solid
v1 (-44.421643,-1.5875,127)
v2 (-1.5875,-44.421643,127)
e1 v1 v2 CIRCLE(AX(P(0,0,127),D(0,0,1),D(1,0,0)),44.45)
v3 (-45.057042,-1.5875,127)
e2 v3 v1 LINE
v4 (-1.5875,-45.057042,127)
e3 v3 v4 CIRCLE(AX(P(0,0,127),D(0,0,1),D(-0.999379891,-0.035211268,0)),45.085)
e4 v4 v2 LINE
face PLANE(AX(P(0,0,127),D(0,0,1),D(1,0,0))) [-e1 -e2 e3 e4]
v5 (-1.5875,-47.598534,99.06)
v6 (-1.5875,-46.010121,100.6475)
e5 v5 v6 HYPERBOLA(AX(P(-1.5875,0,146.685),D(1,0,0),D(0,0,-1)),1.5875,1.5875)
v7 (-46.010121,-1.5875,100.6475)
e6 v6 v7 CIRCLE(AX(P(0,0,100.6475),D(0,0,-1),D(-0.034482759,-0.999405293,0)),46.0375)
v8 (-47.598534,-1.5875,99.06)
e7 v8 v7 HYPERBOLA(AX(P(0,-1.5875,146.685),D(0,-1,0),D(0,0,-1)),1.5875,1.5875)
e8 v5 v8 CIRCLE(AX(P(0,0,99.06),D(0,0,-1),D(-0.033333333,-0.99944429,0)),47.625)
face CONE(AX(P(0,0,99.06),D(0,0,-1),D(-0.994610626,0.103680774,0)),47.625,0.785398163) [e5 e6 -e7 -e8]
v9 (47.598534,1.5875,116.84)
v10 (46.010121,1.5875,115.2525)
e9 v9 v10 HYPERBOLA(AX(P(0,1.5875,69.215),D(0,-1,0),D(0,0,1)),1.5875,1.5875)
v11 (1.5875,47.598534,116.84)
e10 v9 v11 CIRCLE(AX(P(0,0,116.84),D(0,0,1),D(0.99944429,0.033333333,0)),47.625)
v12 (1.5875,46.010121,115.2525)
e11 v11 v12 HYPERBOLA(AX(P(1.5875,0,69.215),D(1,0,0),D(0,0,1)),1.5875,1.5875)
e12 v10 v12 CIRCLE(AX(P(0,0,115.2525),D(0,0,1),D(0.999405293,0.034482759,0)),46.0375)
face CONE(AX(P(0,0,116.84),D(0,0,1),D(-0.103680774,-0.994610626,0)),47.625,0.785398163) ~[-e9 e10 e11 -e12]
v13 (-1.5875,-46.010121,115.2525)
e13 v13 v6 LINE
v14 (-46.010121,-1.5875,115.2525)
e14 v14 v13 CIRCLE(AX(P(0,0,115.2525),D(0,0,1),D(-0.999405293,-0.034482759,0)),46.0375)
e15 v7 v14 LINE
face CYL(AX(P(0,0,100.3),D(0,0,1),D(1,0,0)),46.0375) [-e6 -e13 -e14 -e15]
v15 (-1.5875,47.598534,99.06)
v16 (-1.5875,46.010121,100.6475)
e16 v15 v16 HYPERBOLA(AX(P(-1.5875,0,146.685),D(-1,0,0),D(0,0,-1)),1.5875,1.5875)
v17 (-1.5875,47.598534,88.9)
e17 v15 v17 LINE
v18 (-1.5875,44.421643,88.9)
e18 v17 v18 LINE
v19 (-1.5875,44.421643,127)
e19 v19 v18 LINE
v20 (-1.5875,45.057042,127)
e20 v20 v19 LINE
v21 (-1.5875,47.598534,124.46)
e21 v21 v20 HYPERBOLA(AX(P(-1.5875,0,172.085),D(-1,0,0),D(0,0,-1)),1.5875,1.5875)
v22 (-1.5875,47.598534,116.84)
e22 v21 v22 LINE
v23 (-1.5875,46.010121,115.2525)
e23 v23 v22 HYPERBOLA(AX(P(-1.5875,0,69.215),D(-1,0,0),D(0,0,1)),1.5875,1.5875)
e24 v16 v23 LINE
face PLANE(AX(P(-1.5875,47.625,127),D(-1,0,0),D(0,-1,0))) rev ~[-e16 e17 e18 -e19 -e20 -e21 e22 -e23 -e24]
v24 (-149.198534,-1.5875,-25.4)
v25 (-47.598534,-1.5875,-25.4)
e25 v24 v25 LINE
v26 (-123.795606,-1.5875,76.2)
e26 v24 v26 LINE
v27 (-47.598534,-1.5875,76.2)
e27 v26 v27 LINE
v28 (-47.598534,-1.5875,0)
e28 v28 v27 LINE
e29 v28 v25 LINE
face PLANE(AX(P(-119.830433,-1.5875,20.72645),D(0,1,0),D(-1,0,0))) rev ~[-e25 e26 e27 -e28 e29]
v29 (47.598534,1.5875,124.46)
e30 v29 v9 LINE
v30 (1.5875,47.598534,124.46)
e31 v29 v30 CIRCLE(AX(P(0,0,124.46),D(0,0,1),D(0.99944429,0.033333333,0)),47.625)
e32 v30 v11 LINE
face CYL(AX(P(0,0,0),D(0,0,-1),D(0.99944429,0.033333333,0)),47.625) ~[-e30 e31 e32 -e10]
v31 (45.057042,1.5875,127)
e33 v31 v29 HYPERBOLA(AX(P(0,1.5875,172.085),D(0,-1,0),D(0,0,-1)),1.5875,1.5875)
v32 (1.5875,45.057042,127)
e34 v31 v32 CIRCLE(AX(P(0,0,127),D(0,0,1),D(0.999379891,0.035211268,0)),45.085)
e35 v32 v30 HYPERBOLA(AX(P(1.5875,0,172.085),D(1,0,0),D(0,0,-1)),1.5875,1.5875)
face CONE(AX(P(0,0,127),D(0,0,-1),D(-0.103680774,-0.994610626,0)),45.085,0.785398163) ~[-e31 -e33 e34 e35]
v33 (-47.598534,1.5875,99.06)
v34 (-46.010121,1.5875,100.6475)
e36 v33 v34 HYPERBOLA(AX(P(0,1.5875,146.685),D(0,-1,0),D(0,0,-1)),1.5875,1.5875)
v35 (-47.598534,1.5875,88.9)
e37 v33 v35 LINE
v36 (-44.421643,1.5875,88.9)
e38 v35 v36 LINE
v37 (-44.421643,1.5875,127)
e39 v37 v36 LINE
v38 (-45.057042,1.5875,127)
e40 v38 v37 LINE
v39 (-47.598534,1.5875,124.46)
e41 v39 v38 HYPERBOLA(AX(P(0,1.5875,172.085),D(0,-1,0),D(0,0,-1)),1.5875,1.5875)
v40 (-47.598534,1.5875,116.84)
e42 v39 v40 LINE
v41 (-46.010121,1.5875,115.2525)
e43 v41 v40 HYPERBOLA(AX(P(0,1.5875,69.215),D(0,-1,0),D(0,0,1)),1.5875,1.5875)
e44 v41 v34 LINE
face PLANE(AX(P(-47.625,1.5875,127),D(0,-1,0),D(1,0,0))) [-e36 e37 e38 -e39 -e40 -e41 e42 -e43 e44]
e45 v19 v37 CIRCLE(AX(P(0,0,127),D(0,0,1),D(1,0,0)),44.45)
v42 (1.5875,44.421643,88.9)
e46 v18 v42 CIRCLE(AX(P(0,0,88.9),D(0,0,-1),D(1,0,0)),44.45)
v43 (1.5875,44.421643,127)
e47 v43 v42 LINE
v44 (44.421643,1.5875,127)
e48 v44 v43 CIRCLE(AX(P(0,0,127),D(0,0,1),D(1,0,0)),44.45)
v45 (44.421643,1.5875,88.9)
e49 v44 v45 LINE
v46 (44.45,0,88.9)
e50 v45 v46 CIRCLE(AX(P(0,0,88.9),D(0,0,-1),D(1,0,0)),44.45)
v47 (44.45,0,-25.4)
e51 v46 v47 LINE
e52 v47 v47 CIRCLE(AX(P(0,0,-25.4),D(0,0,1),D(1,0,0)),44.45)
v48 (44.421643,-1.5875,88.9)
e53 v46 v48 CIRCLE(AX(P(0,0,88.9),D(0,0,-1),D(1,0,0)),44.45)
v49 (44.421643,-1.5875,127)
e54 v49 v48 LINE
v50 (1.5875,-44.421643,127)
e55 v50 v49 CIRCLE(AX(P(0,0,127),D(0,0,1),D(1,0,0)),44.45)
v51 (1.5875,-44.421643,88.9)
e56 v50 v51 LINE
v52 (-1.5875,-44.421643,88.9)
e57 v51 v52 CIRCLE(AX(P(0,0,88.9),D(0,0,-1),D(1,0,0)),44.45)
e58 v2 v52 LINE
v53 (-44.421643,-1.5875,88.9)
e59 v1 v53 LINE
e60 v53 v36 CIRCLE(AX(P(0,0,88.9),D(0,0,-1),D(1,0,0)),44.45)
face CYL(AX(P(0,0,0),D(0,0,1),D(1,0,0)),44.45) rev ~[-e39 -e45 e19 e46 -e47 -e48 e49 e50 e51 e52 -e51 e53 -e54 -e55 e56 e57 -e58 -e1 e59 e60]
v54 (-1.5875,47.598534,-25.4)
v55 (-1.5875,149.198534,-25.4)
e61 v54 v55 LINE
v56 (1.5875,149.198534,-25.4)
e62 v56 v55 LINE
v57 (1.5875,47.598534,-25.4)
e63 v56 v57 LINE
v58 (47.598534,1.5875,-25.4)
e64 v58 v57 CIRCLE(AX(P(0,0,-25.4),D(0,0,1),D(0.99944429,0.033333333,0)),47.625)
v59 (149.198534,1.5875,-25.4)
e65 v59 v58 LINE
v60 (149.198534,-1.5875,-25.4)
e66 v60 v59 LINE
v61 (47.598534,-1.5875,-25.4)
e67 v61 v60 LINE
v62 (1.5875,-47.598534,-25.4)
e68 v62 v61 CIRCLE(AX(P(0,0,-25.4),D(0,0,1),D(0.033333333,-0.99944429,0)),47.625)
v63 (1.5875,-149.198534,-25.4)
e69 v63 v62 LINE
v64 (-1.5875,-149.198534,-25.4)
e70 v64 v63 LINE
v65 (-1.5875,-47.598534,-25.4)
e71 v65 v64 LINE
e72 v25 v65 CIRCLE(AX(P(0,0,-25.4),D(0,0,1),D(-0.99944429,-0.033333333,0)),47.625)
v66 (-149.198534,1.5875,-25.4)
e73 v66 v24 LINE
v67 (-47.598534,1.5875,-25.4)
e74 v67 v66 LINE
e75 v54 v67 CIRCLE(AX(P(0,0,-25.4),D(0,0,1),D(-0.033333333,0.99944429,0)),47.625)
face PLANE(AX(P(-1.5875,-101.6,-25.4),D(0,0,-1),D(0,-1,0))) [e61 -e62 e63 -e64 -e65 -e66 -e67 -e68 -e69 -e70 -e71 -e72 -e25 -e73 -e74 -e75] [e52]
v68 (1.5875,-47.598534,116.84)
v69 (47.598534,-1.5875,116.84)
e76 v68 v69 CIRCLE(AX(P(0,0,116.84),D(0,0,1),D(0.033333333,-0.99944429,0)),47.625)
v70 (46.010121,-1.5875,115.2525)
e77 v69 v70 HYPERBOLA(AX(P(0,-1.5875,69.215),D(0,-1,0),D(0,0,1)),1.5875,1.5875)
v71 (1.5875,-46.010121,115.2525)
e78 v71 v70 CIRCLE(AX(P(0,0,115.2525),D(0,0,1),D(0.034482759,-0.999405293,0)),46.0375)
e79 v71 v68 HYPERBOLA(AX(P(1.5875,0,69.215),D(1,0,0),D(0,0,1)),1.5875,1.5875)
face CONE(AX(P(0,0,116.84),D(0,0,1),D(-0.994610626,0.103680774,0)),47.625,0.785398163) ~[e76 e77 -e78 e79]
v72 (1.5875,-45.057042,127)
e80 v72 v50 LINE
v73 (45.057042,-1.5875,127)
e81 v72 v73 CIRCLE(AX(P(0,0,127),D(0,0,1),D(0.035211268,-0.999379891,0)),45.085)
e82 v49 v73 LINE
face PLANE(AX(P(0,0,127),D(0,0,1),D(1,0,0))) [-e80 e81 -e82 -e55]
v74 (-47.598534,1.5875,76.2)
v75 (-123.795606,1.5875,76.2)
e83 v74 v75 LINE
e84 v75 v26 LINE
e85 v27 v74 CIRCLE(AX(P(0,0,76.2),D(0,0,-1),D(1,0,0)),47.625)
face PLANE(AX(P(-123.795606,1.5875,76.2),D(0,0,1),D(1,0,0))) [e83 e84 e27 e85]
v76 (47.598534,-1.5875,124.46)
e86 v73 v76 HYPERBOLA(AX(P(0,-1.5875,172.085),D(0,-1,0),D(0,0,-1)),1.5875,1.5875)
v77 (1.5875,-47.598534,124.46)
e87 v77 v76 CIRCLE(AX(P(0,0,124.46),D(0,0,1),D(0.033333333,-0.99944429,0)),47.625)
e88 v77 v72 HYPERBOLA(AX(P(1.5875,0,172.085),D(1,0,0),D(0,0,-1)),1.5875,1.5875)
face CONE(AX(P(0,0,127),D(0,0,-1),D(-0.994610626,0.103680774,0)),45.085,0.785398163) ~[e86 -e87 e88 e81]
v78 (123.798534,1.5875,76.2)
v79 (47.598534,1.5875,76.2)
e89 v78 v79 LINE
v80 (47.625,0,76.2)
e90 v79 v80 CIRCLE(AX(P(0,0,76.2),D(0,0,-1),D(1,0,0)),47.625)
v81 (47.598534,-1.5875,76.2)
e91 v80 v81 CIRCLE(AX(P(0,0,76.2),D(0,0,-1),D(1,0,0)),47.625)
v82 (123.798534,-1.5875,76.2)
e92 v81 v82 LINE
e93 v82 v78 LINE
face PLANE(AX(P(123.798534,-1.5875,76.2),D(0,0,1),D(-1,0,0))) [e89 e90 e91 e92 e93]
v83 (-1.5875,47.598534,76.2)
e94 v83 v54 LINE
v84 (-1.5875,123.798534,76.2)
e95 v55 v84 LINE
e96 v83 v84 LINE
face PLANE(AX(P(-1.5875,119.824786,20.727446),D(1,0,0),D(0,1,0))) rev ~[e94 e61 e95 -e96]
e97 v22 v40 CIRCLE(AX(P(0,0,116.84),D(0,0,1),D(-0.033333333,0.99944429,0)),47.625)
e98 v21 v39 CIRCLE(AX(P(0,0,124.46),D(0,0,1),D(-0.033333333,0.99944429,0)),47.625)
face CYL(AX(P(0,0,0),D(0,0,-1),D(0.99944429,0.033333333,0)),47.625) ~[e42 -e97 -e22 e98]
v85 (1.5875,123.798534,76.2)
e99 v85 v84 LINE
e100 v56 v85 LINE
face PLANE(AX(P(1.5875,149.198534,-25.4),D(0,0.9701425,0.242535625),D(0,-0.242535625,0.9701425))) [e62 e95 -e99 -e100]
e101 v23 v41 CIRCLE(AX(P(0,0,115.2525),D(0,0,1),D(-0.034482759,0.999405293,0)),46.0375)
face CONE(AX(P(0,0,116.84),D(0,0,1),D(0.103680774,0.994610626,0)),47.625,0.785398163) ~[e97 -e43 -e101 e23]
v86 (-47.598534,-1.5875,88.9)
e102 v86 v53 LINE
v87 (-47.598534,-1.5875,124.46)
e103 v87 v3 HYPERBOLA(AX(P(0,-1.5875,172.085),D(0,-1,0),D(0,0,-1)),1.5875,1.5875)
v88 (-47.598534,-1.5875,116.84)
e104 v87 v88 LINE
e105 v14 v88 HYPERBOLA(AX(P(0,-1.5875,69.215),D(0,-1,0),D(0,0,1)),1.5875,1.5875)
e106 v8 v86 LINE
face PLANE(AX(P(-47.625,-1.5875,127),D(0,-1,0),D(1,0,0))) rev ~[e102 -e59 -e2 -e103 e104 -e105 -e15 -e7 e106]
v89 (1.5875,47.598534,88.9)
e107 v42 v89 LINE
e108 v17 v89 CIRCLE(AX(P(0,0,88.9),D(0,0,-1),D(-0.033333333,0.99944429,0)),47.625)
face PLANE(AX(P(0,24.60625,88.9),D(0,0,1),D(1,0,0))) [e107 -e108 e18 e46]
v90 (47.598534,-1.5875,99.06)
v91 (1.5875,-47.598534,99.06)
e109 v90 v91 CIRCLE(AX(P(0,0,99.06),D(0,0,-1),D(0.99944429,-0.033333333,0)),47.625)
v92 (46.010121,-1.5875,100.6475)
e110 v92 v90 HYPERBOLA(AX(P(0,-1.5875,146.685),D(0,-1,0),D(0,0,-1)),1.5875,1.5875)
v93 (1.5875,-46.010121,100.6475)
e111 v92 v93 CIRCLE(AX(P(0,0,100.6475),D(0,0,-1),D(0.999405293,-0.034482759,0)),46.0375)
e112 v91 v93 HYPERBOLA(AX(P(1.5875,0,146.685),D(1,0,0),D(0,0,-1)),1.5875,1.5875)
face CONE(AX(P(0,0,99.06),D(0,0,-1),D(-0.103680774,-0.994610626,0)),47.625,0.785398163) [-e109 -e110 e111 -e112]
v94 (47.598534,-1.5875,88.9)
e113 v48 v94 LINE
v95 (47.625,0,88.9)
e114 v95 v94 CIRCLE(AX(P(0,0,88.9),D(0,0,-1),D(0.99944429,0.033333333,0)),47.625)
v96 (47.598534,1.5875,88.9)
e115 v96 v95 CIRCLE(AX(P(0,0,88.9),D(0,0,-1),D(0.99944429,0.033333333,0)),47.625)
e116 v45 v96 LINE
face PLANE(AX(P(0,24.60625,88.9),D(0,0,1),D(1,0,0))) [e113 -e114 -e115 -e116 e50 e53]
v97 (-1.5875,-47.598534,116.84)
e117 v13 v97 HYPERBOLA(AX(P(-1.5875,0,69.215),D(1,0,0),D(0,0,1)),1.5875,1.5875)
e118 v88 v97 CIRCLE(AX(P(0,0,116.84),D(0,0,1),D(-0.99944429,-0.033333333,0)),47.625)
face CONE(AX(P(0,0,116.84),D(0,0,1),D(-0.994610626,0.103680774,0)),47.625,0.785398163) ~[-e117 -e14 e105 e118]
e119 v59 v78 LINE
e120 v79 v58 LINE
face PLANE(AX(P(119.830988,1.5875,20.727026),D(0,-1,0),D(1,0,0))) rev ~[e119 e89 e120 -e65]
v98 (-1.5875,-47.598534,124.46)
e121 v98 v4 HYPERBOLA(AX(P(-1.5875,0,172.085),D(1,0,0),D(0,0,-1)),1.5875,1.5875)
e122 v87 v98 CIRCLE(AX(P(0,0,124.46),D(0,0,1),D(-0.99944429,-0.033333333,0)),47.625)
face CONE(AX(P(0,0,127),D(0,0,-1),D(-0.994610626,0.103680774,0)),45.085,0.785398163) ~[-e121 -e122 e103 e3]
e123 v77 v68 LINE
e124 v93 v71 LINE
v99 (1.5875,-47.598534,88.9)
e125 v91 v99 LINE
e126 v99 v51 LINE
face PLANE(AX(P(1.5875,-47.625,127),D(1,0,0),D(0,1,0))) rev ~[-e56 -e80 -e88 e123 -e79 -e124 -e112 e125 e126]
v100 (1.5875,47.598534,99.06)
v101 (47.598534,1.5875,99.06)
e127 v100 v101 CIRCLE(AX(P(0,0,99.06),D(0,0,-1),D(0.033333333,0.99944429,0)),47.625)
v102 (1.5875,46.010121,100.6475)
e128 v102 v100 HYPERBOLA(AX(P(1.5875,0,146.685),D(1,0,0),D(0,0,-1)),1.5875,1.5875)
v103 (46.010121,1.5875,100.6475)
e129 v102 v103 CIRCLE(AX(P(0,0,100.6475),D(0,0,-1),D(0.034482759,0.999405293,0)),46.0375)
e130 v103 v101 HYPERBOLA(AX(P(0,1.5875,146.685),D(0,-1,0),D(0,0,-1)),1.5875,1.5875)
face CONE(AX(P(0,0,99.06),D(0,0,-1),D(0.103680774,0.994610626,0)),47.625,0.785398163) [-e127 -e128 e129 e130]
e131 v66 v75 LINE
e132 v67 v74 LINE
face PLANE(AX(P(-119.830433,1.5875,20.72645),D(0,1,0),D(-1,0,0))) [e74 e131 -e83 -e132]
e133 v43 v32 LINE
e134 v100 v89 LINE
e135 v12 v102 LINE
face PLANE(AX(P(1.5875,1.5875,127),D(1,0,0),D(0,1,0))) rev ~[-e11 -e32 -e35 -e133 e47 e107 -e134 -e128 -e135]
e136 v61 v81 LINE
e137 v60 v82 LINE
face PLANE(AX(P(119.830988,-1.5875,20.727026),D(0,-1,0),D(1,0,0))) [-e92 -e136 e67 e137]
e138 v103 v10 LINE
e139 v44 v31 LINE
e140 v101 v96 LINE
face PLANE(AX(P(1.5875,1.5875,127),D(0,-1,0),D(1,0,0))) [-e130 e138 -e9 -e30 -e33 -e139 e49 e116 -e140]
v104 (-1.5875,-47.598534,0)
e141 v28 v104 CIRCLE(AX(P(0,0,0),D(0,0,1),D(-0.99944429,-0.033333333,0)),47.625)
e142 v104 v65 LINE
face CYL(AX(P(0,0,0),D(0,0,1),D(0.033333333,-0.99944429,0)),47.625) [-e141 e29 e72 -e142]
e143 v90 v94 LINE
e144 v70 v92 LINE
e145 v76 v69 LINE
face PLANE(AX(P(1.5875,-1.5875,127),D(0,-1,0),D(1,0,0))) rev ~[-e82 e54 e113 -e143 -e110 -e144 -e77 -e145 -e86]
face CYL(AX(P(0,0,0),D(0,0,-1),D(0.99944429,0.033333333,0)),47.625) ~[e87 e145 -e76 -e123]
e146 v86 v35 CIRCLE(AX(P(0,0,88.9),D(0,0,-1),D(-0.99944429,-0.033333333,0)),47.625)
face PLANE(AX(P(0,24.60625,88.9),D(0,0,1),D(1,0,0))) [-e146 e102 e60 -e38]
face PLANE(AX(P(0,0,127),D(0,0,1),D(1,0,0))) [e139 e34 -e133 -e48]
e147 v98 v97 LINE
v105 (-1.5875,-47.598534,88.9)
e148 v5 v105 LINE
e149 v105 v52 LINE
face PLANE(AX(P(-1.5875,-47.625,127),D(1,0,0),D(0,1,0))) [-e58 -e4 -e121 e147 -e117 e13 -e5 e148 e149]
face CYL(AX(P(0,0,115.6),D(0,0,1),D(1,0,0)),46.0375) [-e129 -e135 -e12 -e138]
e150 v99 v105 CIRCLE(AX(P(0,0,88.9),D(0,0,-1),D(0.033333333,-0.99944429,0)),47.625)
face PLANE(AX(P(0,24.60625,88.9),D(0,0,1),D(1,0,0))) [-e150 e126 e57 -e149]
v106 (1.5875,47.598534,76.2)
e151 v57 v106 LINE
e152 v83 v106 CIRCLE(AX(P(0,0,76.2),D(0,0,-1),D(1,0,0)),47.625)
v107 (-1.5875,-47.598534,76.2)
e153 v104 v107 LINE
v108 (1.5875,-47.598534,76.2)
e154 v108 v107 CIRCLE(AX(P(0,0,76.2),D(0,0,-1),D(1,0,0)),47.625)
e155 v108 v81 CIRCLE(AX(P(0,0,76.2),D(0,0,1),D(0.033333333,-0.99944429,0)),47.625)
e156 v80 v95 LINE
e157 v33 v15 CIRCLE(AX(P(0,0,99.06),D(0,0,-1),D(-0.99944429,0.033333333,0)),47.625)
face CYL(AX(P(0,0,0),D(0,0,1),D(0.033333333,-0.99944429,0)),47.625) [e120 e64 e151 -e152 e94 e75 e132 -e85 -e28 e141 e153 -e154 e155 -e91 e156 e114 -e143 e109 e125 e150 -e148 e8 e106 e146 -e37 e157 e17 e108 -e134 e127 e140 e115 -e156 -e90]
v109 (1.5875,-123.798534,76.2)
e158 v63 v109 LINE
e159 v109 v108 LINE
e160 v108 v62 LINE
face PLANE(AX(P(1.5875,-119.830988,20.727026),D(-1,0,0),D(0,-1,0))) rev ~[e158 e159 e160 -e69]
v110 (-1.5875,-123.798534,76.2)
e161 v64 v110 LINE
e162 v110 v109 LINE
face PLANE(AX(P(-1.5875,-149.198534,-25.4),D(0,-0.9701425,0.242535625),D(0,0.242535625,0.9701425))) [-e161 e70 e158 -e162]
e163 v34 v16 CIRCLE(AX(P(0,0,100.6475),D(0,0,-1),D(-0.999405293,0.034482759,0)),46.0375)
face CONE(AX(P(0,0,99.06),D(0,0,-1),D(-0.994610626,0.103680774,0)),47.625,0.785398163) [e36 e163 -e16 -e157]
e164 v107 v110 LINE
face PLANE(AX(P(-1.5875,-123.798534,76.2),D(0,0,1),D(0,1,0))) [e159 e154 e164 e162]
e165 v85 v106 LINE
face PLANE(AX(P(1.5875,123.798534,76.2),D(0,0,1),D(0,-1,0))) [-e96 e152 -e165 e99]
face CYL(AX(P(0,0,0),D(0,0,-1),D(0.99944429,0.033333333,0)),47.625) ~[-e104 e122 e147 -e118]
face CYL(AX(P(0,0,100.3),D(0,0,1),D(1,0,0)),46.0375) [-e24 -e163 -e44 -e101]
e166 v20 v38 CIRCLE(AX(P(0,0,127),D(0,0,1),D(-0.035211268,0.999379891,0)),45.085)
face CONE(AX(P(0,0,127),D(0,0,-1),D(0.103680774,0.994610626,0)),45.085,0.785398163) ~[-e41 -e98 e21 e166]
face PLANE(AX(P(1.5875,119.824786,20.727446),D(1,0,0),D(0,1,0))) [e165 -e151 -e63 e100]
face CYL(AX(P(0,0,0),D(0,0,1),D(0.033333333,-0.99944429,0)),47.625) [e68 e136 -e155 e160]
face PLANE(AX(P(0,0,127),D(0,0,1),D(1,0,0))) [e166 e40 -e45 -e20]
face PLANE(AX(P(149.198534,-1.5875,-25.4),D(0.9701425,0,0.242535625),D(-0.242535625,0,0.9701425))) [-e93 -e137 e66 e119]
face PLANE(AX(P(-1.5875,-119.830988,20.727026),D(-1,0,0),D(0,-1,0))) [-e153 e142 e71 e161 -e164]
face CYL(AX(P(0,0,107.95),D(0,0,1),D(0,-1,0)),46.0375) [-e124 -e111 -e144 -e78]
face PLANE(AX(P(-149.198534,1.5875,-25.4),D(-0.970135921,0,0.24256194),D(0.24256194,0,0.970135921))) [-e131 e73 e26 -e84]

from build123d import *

# Parameters (mm, degrees)
F0_R         = 44.45
F1_DEPTH     = 76.2
F2_R         = 47.625
F2_R_2       = 44.45
F3_DEPTH     = 127
F4_W         = 3.175
F4_H         = 46.0375
F4_H_2       = 3.175
F4_W_2       = 46.0375
F5_DEPTH     = 38.1
F6_W         = 1.5875
F6_H         = 12.7
F8_T2_ANGLE  = 101.902331204
F8_T6_ANGLE  = 101.902331204
F8_S7_R      = 46.0375
F8_T8_DEPTH  = 39
F8_T12_ANGLE = 101.902331204
F8_S13_R     = 46.0375
F8_T14_DEPTH = 39
F8_T18_ANGLE = 101.902331204
F8_S19_R     = 46.0375
F8_T20_DEPTH = 39
F8_T24_ANGLE = 101.902331204
F8_S25_R     = 46.0375
F8_T26_DEPTH = 39
F8_T28_ANGLE = 101.902331204
F8_T32_ANGLE = 101.902331204
F8_S33_R     = 46.0375
F8_T34_DEPTH = 39
F8_T36_ANGLE = 101.902331204
F8_T40_ANGLE = 101.902331204
F8_S41_R     = 46.0375
F8_T42_DEPTH = 39
F8_T44_ANGLE = 101.902331204
F8_T48_ANGLE = 101.902331204
F8_S49_R     = 46.0375
F8_T50_DEPTH = 39
F8_T54_ANGLE = 101.902331204
F8_S55_R     = 46.0375
F8_T56_DEPTH = 39
F9_DEPTH     = 25.4
F11_DEPTH    = 3.175
F13_DEPTH    = 3.175
F15_DEPTH    = 3.175
F17_DEPTH    = 3.175


# Not quite as in the source:
# - a fillet or chamfer that OpenCascade refuses, or shapes differently, is made with other operations: its cross-section is extruded or revolved along the edge and cut away or added


with BuildPart() as f1:
    # F0 (on Top) → F1 (new body)
    with BuildSketch(Plane.XY):
        with BuildLine():
            Line((101.6, 1.5875), (47.598534313, 1.5875))
            ThreePointArc((47.598534313, 1.5875), (33.675960454, 33.675960454), (1.5875, 47.598534313))
            Line((1.5875, 47.598534313), (1.5875, 101.5875968992))
            Line((1.5875, 101.5875968992), (-1.5875, 101.5875968992))
            Line((-1.5875, 101.5875968992), (-1.5875, 47.598534313))
            ThreePointArc((-1.5875, 47.598534313), (-33.675960454, 33.675960454), (-47.598534313, 1.5875))
            Line((-47.598534313, 1.5875), (-101.6, 1.5875))
            Line((-101.6, 1.5875), (-101.6, -1.5875))
            Line((-101.6, -1.5875), (-47.598534313, -1.5875))
            ThreePointArc((-47.598534313, -1.5875), (-33.675960454, -33.675960454), (-1.5875, -47.598534313))
            Line((-1.5875, -47.598534313), (-1.5875, -101.6))
            Line((-1.5875, -101.6), (1.5875, -101.6))
            Line((1.5875, -101.6), (1.5875, -47.598534313))
            ThreePointArc((1.5875, -47.598534313), (33.675960454, -33.675960454), (47.598534313, -1.5875))
            Line((47.598534313, -1.5875), (101.6, -1.5875))
            Line((101.6, -1.5875), (101.6, 1.5875))
        make_face()
        Circle(F0_R, mode=Mode.SUBTRACT)
    extrude(amount=F1_DEPTH)

    # F2 (on Top) → F3 (join)
    with BuildSketch(Plane.XY):
        Circle(F2_R)
        Circle(F2_R_2, mode=Mode.SUBTRACT)
    extrude(amount=F3_DEPTH)

    # F4 (on face) → F5 (cut)
    with BuildSketch(Plane.XY.offset(127)):
        with Locations((0, 24.60625)):
            Rectangle(F4_W, F4_H)
        Rectangle(F4_W, F4_H_2)
        with Locations((-24.60625, 0)):
            Rectangle(F4_W_2, F4_H_2)
        with Locations((0, -24.60625)):
            Rectangle(F4_W, F4_H)
        with Locations((24.60625, 0)):
            Rectangle(F4_W_2, F4_H_2)
    extrude(amount=-F5_DEPTH, mode=Mode.SUBTRACT)

    # F6 (on Right) → F7 (revolve, cut)
    with BuildSketch(Plane.YZ):
        with Locations((-46.83125, 107.95)):
            Rectangle(F6_W, F6_H)
    revolve(axis=Axis((0, 0, 63.5), (0, 0, 1)), mode=Mode.SUBTRACT)

    # F8: chamfer of 2.54 on 12 edges, made by hand

    # F8_s1 → F8_t2 (revolve, cut)
    with BuildSketch(Plane(origin=(0, 0, 0), x_dir=(0, 0, 1), z_dir=(0.1036807735, 0.9946106259, 0))):
        Polygon((127, -45.085), (124.46, -47.625), (127, -47.625), align=None)
    revolve(axis=Axis((0, 0, 127), (0, 0, 1)), revolution_arc=F8_T2_ANGLE, mode=Mode.SUBTRACT)


with BuildPart() as f8_tool4:
    # F8_s5 → F8_t6 (revolve)
    with BuildSketch(Plane(origin=(0, 0, 0), x_dir=(0, 0, 1), z_dir=(0.1036807735, 0.9946106259, 0))):
        Polygon((116.84, -47.625), (114.3, -45.085), (114.3, -47.625), align=None)
    revolve(axis=Axis((0, 0, 114.3), (0, 0, 1)), revolution_arc=F8_T6_ANGLE)

    # F8_s7 → F8_t8 (cut, symmetric)
    with BuildSketch(Plane.XY.offset(115.6)):
        Circle(F8_S7_R)
    extrude(amount=F8_T8_DEPTH, both=True, mode=Mode.SUBTRACT)


with BuildPart() as f1_1:
    add(f1.part)

    # F8_t3: cut F8_tool4
    add(f8_tool4.part, mode=Mode.SUBTRACT)


with BuildPart() as f8_tool10:
    # F8_s11 → F8_t12 (revolve)
    with BuildSketch(Plane(origin=(0, 0, 0), x_dir=(0, 0, 1), z_dir=(0.1036807735, 0.9946106259, 0))):
        Polygon((99.06, -47.625), (101.6, -45.085), (101.6, -47.625), align=None)
    revolve(axis=Axis((0, 0, 101.6), (0, 0, 1)), revolution_arc=F8_T12_ANGLE)

    # F8_s13 → F8_t14 (cut, symmetric)
    with BuildSketch(Plane.XY.offset(100.3)):
        Circle(F8_S13_R)
    extrude(amount=F8_T14_DEPTH, both=True, mode=Mode.SUBTRACT)


with BuildPart() as f1_2:
    add(f1_1.part)

    # F8_t9: cut F8_tool10
    add(f8_tool10.part, mode=Mode.SUBTRACT)


with BuildPart() as f8_tool16:
    # F8_s17 → F8_t18 (revolve)
    with BuildSketch(Plane(origin=(0, 0, 0), x_dir=(0, 0, 1), z_dir=(-0.9946106259, 0.1036807735, 0))):
        Polygon((99.06, -47.625), (101.6, -45.085), (101.6, -47.625), align=None)
    revolve(axis=Axis((0, 0, 101.6), (0, 0, 1)), revolution_arc=F8_T18_ANGLE)

    # F8_s19 → F8_t20 (cut, symmetric)
    with BuildSketch(Plane.XY.offset(100.3)):
        Circle(F8_S19_R)
    extrude(amount=F8_T20_DEPTH, both=True, mode=Mode.SUBTRACT)


with BuildPart() as f1_3:
    add(f1_2.part)

    # F8_t15: cut F8_tool16
    add(f8_tool16.part, mode=Mode.SUBTRACT)


with BuildPart() as f8_tool22:
    # F8_s23 → F8_t24 (revolve)
    with BuildSketch(Plane(origin=(0, 0, 0), x_dir=(0, 0, 1), z_dir=(-0.9946106259, 0.1036807735, 0))):
        Polygon((116.84, -47.625), (114.3, -45.085), (114.3, -47.625), align=None)
    revolve(axis=Axis((0, 0, 114.3), (0, 0, 1)), revolution_arc=F8_T24_ANGLE)

    # F8_s25 → F8_t26 (cut, symmetric)
    with BuildSketch(Plane.XY.offset(115.6)):
        Circle(F8_S25_R)
    extrude(amount=F8_T26_DEPTH, both=True, mode=Mode.SUBTRACT)


with BuildPart() as f1_4:
    add(f1_3.part)

    # F8_t21: cut F8_tool22
    add(f8_tool22.part, mode=Mode.SUBTRACT)

    # F8_s27 → F8_t28 (revolve, cut)
    with BuildSketch(Plane(origin=(0, 0, 0), x_dir=(0, 0, 1), z_dir=(-0.9946106259, 0.1036807735, 0))):
        Polygon((127, -45.085), (124.46, -47.625), (127, -47.625), align=None)
    revolve(axis=Axis((0, 0, 127), (0, 0, 1)), revolution_arc=F8_T28_ANGLE, mode=Mode.SUBTRACT)


with BuildPart() as f8_tool30:
    # F8_s31 → F8_t32 (revolve)
    with BuildSketch(Plane(origin=(0, 0, 0), x_dir=(0, 0, 1), z_dir=(0.9946106259, -0.1036807735, 0))):
        Polygon((116.84, -47.625), (114.3, -45.085), (114.3, -47.625), align=None)
    revolve(axis=Axis((0, 0, 114.3), (0, 0, 1)), revolution_arc=F8_T32_ANGLE)

    # F8_s33 → F8_t34 (cut, symmetric)
    with BuildSketch(Plane.XY.offset(115.6)):
        Circle(F8_S33_R)
    extrude(amount=F8_T34_DEPTH, both=True, mode=Mode.SUBTRACT)


with BuildPart() as f1_5:
    add(f1_4.part)

    # F8_t29: cut F8_tool30
    add(f8_tool30.part, mode=Mode.SUBTRACT)

    # F8_s35 → F8_t36 (revolve, cut)
    with BuildSketch(Plane(origin=(0, 0, 0), x_dir=(0, 0, 1), z_dir=(0.9946106259, -0.1036807735, 0))):
        Polygon((127, -45.085), (124.46, -47.625), (127, -47.625), align=None)
    revolve(axis=Axis((0, 0, 127), (0, 0, 1)), revolution_arc=F8_T36_ANGLE, mode=Mode.SUBTRACT)


with BuildPart() as f8_tool38:
    # F8_s39 → F8_t40 (revolve)
    with BuildSketch(Plane(origin=(0, 0, 0), x_dir=(0, 0, 1), z_dir=(0.9946106259, -0.1036807735, 0))):
        Polygon((99.06, -47.625), (101.6, -45.085), (101.6, -47.625), align=None)
    revolve(axis=Axis((0, 0, 101.6), (0, 0, 1)), revolution_arc=F8_T40_ANGLE)

    # F8_s41 → F8_t42 (cut, symmetric)
    with BuildSketch(Plane.XY.offset(100.3)):
        Circle(F8_S41_R)
    extrude(amount=F8_T42_DEPTH, both=True, mode=Mode.SUBTRACT)


with BuildPart() as f1_6:
    add(f1_5.part)

    # F8_t37: cut F8_tool38
    add(f8_tool38.part, mode=Mode.SUBTRACT)

    # F8_s43 → F8_t44 (revolve, cut)
    with BuildSketch(Plane(origin=(0, 0, 0), x_dir=(0, 0, 1), z_dir=(-0.1036807735, -0.9946106259, 0))):
        Polygon((127, -45.085), (124.46, -47.625), (127, -47.625), align=None)
    revolve(axis=Axis((0, 0, 127), (0, 0, 1)), revolution_arc=F8_T44_ANGLE, mode=Mode.SUBTRACT)


with BuildPart() as f8_tool46:
    # F8_s47 → F8_t48 (revolve)
    with BuildSketch(Plane(origin=(0, 0, 0), x_dir=(0, 0, 1), z_dir=(-0.1036807735, -0.9946106259, 0))):
        Polygon((116.84, -47.625), (114.3, -45.085), (114.3, -47.625), align=None)
    revolve(axis=Axis((0, 0, 114.3), (0, 0, 1)), revolution_arc=F8_T48_ANGLE)

    # F8_s49 → F8_t50 (cut, symmetric)
    with BuildSketch(Plane.XY.offset(115.6)):
        Circle(F8_S49_R)
    extrude(amount=F8_T50_DEPTH, both=True, mode=Mode.SUBTRACT)


with BuildPart() as f1_7:
    add(f1_6.part)

    # F8_t45: cut F8_tool46
    add(f8_tool46.part, mode=Mode.SUBTRACT)


with BuildPart() as f8_tool52:
    # F8_s53 → F8_t54 (revolve)
    with BuildSketch(Plane(origin=(0, 0, 0), x_dir=(0, 0, 1), z_dir=(-0.1036807735, -0.9946106259, 0))):
        Polygon((99.06, -47.625), (101.6, -45.085), (101.6, -47.625), align=None)
    revolve(axis=Axis((0, 0, 101.6), (0, 0, 1)), revolution_arc=F8_T54_ANGLE)

    # F8_s55 → F8_t56 (cut, symmetric)
    with BuildSketch(Plane.XY.offset(100.3)):
        Circle(F8_S55_R)
    extrude(amount=F8_T56_DEPTH, both=True, mode=Mode.SUBTRACT)


with BuildPart() as f1_8:
    add(f1_7.part)

    # F8_t51: cut F8_tool52
    add(f8_tool52.part, mode=Mode.SUBTRACT)

    # F9 (add): a face of the model
    f9_faces = [f1_8.faces().sort_by_distance(p)[0] for p in [
        (0, -98.7264057431, 0),
    ]]
    extrude(f9_faces, amount=F9_DEPTH)

    # F10 (on face) → F11 (join, through all)
    with BuildSketch(Plane(origin=(0, 1.5875, 0), x_dir=(-1, 0, 0), z_dir=(0, 1, 0))):
        Polygon((123.7956061959, 76.2), (101.6, 76.2), (101.6, -25.4), (149.198534313, -25.4), align=None)
    extrude(amount=-F11_DEPTH)

    # F12 (on face) → F13 (join, through all)
    with BuildSketch(Plane.YZ.offset(1.5875)):
        Polygon((101.5875968992, 76.2), (101.5875968992, -25.4), (149.198534313, -25.4), (123.798534313, 76.2), align=None)
    extrude(amount=-F13_DEPTH)

    # F14 (on face) → F15 (join, through all)
    with BuildSketch(Plane.XZ.offset(1.5875)):
        Polygon((123.798534313, 76.2), (101.6, 76.2), (101.6, -25.4), (149.198534313, -25.4), align=None)
    extrude(amount=-F15_DEPTH)

    # F16 (on face) → F17 (join, through all)
    with BuildSketch(Plane(origin=(-1.5875, 0, 0), x_dir=(0, -1, 0), z_dir=(-1, 0, 0))):
        Polygon((123.798534313, 76.2), (101.6, 76.2), (101.6, -25.4), (149.198534313, -25.4), align=None)
    extrude(amount=-F17_DEPTH)


solid = f1_8.part
